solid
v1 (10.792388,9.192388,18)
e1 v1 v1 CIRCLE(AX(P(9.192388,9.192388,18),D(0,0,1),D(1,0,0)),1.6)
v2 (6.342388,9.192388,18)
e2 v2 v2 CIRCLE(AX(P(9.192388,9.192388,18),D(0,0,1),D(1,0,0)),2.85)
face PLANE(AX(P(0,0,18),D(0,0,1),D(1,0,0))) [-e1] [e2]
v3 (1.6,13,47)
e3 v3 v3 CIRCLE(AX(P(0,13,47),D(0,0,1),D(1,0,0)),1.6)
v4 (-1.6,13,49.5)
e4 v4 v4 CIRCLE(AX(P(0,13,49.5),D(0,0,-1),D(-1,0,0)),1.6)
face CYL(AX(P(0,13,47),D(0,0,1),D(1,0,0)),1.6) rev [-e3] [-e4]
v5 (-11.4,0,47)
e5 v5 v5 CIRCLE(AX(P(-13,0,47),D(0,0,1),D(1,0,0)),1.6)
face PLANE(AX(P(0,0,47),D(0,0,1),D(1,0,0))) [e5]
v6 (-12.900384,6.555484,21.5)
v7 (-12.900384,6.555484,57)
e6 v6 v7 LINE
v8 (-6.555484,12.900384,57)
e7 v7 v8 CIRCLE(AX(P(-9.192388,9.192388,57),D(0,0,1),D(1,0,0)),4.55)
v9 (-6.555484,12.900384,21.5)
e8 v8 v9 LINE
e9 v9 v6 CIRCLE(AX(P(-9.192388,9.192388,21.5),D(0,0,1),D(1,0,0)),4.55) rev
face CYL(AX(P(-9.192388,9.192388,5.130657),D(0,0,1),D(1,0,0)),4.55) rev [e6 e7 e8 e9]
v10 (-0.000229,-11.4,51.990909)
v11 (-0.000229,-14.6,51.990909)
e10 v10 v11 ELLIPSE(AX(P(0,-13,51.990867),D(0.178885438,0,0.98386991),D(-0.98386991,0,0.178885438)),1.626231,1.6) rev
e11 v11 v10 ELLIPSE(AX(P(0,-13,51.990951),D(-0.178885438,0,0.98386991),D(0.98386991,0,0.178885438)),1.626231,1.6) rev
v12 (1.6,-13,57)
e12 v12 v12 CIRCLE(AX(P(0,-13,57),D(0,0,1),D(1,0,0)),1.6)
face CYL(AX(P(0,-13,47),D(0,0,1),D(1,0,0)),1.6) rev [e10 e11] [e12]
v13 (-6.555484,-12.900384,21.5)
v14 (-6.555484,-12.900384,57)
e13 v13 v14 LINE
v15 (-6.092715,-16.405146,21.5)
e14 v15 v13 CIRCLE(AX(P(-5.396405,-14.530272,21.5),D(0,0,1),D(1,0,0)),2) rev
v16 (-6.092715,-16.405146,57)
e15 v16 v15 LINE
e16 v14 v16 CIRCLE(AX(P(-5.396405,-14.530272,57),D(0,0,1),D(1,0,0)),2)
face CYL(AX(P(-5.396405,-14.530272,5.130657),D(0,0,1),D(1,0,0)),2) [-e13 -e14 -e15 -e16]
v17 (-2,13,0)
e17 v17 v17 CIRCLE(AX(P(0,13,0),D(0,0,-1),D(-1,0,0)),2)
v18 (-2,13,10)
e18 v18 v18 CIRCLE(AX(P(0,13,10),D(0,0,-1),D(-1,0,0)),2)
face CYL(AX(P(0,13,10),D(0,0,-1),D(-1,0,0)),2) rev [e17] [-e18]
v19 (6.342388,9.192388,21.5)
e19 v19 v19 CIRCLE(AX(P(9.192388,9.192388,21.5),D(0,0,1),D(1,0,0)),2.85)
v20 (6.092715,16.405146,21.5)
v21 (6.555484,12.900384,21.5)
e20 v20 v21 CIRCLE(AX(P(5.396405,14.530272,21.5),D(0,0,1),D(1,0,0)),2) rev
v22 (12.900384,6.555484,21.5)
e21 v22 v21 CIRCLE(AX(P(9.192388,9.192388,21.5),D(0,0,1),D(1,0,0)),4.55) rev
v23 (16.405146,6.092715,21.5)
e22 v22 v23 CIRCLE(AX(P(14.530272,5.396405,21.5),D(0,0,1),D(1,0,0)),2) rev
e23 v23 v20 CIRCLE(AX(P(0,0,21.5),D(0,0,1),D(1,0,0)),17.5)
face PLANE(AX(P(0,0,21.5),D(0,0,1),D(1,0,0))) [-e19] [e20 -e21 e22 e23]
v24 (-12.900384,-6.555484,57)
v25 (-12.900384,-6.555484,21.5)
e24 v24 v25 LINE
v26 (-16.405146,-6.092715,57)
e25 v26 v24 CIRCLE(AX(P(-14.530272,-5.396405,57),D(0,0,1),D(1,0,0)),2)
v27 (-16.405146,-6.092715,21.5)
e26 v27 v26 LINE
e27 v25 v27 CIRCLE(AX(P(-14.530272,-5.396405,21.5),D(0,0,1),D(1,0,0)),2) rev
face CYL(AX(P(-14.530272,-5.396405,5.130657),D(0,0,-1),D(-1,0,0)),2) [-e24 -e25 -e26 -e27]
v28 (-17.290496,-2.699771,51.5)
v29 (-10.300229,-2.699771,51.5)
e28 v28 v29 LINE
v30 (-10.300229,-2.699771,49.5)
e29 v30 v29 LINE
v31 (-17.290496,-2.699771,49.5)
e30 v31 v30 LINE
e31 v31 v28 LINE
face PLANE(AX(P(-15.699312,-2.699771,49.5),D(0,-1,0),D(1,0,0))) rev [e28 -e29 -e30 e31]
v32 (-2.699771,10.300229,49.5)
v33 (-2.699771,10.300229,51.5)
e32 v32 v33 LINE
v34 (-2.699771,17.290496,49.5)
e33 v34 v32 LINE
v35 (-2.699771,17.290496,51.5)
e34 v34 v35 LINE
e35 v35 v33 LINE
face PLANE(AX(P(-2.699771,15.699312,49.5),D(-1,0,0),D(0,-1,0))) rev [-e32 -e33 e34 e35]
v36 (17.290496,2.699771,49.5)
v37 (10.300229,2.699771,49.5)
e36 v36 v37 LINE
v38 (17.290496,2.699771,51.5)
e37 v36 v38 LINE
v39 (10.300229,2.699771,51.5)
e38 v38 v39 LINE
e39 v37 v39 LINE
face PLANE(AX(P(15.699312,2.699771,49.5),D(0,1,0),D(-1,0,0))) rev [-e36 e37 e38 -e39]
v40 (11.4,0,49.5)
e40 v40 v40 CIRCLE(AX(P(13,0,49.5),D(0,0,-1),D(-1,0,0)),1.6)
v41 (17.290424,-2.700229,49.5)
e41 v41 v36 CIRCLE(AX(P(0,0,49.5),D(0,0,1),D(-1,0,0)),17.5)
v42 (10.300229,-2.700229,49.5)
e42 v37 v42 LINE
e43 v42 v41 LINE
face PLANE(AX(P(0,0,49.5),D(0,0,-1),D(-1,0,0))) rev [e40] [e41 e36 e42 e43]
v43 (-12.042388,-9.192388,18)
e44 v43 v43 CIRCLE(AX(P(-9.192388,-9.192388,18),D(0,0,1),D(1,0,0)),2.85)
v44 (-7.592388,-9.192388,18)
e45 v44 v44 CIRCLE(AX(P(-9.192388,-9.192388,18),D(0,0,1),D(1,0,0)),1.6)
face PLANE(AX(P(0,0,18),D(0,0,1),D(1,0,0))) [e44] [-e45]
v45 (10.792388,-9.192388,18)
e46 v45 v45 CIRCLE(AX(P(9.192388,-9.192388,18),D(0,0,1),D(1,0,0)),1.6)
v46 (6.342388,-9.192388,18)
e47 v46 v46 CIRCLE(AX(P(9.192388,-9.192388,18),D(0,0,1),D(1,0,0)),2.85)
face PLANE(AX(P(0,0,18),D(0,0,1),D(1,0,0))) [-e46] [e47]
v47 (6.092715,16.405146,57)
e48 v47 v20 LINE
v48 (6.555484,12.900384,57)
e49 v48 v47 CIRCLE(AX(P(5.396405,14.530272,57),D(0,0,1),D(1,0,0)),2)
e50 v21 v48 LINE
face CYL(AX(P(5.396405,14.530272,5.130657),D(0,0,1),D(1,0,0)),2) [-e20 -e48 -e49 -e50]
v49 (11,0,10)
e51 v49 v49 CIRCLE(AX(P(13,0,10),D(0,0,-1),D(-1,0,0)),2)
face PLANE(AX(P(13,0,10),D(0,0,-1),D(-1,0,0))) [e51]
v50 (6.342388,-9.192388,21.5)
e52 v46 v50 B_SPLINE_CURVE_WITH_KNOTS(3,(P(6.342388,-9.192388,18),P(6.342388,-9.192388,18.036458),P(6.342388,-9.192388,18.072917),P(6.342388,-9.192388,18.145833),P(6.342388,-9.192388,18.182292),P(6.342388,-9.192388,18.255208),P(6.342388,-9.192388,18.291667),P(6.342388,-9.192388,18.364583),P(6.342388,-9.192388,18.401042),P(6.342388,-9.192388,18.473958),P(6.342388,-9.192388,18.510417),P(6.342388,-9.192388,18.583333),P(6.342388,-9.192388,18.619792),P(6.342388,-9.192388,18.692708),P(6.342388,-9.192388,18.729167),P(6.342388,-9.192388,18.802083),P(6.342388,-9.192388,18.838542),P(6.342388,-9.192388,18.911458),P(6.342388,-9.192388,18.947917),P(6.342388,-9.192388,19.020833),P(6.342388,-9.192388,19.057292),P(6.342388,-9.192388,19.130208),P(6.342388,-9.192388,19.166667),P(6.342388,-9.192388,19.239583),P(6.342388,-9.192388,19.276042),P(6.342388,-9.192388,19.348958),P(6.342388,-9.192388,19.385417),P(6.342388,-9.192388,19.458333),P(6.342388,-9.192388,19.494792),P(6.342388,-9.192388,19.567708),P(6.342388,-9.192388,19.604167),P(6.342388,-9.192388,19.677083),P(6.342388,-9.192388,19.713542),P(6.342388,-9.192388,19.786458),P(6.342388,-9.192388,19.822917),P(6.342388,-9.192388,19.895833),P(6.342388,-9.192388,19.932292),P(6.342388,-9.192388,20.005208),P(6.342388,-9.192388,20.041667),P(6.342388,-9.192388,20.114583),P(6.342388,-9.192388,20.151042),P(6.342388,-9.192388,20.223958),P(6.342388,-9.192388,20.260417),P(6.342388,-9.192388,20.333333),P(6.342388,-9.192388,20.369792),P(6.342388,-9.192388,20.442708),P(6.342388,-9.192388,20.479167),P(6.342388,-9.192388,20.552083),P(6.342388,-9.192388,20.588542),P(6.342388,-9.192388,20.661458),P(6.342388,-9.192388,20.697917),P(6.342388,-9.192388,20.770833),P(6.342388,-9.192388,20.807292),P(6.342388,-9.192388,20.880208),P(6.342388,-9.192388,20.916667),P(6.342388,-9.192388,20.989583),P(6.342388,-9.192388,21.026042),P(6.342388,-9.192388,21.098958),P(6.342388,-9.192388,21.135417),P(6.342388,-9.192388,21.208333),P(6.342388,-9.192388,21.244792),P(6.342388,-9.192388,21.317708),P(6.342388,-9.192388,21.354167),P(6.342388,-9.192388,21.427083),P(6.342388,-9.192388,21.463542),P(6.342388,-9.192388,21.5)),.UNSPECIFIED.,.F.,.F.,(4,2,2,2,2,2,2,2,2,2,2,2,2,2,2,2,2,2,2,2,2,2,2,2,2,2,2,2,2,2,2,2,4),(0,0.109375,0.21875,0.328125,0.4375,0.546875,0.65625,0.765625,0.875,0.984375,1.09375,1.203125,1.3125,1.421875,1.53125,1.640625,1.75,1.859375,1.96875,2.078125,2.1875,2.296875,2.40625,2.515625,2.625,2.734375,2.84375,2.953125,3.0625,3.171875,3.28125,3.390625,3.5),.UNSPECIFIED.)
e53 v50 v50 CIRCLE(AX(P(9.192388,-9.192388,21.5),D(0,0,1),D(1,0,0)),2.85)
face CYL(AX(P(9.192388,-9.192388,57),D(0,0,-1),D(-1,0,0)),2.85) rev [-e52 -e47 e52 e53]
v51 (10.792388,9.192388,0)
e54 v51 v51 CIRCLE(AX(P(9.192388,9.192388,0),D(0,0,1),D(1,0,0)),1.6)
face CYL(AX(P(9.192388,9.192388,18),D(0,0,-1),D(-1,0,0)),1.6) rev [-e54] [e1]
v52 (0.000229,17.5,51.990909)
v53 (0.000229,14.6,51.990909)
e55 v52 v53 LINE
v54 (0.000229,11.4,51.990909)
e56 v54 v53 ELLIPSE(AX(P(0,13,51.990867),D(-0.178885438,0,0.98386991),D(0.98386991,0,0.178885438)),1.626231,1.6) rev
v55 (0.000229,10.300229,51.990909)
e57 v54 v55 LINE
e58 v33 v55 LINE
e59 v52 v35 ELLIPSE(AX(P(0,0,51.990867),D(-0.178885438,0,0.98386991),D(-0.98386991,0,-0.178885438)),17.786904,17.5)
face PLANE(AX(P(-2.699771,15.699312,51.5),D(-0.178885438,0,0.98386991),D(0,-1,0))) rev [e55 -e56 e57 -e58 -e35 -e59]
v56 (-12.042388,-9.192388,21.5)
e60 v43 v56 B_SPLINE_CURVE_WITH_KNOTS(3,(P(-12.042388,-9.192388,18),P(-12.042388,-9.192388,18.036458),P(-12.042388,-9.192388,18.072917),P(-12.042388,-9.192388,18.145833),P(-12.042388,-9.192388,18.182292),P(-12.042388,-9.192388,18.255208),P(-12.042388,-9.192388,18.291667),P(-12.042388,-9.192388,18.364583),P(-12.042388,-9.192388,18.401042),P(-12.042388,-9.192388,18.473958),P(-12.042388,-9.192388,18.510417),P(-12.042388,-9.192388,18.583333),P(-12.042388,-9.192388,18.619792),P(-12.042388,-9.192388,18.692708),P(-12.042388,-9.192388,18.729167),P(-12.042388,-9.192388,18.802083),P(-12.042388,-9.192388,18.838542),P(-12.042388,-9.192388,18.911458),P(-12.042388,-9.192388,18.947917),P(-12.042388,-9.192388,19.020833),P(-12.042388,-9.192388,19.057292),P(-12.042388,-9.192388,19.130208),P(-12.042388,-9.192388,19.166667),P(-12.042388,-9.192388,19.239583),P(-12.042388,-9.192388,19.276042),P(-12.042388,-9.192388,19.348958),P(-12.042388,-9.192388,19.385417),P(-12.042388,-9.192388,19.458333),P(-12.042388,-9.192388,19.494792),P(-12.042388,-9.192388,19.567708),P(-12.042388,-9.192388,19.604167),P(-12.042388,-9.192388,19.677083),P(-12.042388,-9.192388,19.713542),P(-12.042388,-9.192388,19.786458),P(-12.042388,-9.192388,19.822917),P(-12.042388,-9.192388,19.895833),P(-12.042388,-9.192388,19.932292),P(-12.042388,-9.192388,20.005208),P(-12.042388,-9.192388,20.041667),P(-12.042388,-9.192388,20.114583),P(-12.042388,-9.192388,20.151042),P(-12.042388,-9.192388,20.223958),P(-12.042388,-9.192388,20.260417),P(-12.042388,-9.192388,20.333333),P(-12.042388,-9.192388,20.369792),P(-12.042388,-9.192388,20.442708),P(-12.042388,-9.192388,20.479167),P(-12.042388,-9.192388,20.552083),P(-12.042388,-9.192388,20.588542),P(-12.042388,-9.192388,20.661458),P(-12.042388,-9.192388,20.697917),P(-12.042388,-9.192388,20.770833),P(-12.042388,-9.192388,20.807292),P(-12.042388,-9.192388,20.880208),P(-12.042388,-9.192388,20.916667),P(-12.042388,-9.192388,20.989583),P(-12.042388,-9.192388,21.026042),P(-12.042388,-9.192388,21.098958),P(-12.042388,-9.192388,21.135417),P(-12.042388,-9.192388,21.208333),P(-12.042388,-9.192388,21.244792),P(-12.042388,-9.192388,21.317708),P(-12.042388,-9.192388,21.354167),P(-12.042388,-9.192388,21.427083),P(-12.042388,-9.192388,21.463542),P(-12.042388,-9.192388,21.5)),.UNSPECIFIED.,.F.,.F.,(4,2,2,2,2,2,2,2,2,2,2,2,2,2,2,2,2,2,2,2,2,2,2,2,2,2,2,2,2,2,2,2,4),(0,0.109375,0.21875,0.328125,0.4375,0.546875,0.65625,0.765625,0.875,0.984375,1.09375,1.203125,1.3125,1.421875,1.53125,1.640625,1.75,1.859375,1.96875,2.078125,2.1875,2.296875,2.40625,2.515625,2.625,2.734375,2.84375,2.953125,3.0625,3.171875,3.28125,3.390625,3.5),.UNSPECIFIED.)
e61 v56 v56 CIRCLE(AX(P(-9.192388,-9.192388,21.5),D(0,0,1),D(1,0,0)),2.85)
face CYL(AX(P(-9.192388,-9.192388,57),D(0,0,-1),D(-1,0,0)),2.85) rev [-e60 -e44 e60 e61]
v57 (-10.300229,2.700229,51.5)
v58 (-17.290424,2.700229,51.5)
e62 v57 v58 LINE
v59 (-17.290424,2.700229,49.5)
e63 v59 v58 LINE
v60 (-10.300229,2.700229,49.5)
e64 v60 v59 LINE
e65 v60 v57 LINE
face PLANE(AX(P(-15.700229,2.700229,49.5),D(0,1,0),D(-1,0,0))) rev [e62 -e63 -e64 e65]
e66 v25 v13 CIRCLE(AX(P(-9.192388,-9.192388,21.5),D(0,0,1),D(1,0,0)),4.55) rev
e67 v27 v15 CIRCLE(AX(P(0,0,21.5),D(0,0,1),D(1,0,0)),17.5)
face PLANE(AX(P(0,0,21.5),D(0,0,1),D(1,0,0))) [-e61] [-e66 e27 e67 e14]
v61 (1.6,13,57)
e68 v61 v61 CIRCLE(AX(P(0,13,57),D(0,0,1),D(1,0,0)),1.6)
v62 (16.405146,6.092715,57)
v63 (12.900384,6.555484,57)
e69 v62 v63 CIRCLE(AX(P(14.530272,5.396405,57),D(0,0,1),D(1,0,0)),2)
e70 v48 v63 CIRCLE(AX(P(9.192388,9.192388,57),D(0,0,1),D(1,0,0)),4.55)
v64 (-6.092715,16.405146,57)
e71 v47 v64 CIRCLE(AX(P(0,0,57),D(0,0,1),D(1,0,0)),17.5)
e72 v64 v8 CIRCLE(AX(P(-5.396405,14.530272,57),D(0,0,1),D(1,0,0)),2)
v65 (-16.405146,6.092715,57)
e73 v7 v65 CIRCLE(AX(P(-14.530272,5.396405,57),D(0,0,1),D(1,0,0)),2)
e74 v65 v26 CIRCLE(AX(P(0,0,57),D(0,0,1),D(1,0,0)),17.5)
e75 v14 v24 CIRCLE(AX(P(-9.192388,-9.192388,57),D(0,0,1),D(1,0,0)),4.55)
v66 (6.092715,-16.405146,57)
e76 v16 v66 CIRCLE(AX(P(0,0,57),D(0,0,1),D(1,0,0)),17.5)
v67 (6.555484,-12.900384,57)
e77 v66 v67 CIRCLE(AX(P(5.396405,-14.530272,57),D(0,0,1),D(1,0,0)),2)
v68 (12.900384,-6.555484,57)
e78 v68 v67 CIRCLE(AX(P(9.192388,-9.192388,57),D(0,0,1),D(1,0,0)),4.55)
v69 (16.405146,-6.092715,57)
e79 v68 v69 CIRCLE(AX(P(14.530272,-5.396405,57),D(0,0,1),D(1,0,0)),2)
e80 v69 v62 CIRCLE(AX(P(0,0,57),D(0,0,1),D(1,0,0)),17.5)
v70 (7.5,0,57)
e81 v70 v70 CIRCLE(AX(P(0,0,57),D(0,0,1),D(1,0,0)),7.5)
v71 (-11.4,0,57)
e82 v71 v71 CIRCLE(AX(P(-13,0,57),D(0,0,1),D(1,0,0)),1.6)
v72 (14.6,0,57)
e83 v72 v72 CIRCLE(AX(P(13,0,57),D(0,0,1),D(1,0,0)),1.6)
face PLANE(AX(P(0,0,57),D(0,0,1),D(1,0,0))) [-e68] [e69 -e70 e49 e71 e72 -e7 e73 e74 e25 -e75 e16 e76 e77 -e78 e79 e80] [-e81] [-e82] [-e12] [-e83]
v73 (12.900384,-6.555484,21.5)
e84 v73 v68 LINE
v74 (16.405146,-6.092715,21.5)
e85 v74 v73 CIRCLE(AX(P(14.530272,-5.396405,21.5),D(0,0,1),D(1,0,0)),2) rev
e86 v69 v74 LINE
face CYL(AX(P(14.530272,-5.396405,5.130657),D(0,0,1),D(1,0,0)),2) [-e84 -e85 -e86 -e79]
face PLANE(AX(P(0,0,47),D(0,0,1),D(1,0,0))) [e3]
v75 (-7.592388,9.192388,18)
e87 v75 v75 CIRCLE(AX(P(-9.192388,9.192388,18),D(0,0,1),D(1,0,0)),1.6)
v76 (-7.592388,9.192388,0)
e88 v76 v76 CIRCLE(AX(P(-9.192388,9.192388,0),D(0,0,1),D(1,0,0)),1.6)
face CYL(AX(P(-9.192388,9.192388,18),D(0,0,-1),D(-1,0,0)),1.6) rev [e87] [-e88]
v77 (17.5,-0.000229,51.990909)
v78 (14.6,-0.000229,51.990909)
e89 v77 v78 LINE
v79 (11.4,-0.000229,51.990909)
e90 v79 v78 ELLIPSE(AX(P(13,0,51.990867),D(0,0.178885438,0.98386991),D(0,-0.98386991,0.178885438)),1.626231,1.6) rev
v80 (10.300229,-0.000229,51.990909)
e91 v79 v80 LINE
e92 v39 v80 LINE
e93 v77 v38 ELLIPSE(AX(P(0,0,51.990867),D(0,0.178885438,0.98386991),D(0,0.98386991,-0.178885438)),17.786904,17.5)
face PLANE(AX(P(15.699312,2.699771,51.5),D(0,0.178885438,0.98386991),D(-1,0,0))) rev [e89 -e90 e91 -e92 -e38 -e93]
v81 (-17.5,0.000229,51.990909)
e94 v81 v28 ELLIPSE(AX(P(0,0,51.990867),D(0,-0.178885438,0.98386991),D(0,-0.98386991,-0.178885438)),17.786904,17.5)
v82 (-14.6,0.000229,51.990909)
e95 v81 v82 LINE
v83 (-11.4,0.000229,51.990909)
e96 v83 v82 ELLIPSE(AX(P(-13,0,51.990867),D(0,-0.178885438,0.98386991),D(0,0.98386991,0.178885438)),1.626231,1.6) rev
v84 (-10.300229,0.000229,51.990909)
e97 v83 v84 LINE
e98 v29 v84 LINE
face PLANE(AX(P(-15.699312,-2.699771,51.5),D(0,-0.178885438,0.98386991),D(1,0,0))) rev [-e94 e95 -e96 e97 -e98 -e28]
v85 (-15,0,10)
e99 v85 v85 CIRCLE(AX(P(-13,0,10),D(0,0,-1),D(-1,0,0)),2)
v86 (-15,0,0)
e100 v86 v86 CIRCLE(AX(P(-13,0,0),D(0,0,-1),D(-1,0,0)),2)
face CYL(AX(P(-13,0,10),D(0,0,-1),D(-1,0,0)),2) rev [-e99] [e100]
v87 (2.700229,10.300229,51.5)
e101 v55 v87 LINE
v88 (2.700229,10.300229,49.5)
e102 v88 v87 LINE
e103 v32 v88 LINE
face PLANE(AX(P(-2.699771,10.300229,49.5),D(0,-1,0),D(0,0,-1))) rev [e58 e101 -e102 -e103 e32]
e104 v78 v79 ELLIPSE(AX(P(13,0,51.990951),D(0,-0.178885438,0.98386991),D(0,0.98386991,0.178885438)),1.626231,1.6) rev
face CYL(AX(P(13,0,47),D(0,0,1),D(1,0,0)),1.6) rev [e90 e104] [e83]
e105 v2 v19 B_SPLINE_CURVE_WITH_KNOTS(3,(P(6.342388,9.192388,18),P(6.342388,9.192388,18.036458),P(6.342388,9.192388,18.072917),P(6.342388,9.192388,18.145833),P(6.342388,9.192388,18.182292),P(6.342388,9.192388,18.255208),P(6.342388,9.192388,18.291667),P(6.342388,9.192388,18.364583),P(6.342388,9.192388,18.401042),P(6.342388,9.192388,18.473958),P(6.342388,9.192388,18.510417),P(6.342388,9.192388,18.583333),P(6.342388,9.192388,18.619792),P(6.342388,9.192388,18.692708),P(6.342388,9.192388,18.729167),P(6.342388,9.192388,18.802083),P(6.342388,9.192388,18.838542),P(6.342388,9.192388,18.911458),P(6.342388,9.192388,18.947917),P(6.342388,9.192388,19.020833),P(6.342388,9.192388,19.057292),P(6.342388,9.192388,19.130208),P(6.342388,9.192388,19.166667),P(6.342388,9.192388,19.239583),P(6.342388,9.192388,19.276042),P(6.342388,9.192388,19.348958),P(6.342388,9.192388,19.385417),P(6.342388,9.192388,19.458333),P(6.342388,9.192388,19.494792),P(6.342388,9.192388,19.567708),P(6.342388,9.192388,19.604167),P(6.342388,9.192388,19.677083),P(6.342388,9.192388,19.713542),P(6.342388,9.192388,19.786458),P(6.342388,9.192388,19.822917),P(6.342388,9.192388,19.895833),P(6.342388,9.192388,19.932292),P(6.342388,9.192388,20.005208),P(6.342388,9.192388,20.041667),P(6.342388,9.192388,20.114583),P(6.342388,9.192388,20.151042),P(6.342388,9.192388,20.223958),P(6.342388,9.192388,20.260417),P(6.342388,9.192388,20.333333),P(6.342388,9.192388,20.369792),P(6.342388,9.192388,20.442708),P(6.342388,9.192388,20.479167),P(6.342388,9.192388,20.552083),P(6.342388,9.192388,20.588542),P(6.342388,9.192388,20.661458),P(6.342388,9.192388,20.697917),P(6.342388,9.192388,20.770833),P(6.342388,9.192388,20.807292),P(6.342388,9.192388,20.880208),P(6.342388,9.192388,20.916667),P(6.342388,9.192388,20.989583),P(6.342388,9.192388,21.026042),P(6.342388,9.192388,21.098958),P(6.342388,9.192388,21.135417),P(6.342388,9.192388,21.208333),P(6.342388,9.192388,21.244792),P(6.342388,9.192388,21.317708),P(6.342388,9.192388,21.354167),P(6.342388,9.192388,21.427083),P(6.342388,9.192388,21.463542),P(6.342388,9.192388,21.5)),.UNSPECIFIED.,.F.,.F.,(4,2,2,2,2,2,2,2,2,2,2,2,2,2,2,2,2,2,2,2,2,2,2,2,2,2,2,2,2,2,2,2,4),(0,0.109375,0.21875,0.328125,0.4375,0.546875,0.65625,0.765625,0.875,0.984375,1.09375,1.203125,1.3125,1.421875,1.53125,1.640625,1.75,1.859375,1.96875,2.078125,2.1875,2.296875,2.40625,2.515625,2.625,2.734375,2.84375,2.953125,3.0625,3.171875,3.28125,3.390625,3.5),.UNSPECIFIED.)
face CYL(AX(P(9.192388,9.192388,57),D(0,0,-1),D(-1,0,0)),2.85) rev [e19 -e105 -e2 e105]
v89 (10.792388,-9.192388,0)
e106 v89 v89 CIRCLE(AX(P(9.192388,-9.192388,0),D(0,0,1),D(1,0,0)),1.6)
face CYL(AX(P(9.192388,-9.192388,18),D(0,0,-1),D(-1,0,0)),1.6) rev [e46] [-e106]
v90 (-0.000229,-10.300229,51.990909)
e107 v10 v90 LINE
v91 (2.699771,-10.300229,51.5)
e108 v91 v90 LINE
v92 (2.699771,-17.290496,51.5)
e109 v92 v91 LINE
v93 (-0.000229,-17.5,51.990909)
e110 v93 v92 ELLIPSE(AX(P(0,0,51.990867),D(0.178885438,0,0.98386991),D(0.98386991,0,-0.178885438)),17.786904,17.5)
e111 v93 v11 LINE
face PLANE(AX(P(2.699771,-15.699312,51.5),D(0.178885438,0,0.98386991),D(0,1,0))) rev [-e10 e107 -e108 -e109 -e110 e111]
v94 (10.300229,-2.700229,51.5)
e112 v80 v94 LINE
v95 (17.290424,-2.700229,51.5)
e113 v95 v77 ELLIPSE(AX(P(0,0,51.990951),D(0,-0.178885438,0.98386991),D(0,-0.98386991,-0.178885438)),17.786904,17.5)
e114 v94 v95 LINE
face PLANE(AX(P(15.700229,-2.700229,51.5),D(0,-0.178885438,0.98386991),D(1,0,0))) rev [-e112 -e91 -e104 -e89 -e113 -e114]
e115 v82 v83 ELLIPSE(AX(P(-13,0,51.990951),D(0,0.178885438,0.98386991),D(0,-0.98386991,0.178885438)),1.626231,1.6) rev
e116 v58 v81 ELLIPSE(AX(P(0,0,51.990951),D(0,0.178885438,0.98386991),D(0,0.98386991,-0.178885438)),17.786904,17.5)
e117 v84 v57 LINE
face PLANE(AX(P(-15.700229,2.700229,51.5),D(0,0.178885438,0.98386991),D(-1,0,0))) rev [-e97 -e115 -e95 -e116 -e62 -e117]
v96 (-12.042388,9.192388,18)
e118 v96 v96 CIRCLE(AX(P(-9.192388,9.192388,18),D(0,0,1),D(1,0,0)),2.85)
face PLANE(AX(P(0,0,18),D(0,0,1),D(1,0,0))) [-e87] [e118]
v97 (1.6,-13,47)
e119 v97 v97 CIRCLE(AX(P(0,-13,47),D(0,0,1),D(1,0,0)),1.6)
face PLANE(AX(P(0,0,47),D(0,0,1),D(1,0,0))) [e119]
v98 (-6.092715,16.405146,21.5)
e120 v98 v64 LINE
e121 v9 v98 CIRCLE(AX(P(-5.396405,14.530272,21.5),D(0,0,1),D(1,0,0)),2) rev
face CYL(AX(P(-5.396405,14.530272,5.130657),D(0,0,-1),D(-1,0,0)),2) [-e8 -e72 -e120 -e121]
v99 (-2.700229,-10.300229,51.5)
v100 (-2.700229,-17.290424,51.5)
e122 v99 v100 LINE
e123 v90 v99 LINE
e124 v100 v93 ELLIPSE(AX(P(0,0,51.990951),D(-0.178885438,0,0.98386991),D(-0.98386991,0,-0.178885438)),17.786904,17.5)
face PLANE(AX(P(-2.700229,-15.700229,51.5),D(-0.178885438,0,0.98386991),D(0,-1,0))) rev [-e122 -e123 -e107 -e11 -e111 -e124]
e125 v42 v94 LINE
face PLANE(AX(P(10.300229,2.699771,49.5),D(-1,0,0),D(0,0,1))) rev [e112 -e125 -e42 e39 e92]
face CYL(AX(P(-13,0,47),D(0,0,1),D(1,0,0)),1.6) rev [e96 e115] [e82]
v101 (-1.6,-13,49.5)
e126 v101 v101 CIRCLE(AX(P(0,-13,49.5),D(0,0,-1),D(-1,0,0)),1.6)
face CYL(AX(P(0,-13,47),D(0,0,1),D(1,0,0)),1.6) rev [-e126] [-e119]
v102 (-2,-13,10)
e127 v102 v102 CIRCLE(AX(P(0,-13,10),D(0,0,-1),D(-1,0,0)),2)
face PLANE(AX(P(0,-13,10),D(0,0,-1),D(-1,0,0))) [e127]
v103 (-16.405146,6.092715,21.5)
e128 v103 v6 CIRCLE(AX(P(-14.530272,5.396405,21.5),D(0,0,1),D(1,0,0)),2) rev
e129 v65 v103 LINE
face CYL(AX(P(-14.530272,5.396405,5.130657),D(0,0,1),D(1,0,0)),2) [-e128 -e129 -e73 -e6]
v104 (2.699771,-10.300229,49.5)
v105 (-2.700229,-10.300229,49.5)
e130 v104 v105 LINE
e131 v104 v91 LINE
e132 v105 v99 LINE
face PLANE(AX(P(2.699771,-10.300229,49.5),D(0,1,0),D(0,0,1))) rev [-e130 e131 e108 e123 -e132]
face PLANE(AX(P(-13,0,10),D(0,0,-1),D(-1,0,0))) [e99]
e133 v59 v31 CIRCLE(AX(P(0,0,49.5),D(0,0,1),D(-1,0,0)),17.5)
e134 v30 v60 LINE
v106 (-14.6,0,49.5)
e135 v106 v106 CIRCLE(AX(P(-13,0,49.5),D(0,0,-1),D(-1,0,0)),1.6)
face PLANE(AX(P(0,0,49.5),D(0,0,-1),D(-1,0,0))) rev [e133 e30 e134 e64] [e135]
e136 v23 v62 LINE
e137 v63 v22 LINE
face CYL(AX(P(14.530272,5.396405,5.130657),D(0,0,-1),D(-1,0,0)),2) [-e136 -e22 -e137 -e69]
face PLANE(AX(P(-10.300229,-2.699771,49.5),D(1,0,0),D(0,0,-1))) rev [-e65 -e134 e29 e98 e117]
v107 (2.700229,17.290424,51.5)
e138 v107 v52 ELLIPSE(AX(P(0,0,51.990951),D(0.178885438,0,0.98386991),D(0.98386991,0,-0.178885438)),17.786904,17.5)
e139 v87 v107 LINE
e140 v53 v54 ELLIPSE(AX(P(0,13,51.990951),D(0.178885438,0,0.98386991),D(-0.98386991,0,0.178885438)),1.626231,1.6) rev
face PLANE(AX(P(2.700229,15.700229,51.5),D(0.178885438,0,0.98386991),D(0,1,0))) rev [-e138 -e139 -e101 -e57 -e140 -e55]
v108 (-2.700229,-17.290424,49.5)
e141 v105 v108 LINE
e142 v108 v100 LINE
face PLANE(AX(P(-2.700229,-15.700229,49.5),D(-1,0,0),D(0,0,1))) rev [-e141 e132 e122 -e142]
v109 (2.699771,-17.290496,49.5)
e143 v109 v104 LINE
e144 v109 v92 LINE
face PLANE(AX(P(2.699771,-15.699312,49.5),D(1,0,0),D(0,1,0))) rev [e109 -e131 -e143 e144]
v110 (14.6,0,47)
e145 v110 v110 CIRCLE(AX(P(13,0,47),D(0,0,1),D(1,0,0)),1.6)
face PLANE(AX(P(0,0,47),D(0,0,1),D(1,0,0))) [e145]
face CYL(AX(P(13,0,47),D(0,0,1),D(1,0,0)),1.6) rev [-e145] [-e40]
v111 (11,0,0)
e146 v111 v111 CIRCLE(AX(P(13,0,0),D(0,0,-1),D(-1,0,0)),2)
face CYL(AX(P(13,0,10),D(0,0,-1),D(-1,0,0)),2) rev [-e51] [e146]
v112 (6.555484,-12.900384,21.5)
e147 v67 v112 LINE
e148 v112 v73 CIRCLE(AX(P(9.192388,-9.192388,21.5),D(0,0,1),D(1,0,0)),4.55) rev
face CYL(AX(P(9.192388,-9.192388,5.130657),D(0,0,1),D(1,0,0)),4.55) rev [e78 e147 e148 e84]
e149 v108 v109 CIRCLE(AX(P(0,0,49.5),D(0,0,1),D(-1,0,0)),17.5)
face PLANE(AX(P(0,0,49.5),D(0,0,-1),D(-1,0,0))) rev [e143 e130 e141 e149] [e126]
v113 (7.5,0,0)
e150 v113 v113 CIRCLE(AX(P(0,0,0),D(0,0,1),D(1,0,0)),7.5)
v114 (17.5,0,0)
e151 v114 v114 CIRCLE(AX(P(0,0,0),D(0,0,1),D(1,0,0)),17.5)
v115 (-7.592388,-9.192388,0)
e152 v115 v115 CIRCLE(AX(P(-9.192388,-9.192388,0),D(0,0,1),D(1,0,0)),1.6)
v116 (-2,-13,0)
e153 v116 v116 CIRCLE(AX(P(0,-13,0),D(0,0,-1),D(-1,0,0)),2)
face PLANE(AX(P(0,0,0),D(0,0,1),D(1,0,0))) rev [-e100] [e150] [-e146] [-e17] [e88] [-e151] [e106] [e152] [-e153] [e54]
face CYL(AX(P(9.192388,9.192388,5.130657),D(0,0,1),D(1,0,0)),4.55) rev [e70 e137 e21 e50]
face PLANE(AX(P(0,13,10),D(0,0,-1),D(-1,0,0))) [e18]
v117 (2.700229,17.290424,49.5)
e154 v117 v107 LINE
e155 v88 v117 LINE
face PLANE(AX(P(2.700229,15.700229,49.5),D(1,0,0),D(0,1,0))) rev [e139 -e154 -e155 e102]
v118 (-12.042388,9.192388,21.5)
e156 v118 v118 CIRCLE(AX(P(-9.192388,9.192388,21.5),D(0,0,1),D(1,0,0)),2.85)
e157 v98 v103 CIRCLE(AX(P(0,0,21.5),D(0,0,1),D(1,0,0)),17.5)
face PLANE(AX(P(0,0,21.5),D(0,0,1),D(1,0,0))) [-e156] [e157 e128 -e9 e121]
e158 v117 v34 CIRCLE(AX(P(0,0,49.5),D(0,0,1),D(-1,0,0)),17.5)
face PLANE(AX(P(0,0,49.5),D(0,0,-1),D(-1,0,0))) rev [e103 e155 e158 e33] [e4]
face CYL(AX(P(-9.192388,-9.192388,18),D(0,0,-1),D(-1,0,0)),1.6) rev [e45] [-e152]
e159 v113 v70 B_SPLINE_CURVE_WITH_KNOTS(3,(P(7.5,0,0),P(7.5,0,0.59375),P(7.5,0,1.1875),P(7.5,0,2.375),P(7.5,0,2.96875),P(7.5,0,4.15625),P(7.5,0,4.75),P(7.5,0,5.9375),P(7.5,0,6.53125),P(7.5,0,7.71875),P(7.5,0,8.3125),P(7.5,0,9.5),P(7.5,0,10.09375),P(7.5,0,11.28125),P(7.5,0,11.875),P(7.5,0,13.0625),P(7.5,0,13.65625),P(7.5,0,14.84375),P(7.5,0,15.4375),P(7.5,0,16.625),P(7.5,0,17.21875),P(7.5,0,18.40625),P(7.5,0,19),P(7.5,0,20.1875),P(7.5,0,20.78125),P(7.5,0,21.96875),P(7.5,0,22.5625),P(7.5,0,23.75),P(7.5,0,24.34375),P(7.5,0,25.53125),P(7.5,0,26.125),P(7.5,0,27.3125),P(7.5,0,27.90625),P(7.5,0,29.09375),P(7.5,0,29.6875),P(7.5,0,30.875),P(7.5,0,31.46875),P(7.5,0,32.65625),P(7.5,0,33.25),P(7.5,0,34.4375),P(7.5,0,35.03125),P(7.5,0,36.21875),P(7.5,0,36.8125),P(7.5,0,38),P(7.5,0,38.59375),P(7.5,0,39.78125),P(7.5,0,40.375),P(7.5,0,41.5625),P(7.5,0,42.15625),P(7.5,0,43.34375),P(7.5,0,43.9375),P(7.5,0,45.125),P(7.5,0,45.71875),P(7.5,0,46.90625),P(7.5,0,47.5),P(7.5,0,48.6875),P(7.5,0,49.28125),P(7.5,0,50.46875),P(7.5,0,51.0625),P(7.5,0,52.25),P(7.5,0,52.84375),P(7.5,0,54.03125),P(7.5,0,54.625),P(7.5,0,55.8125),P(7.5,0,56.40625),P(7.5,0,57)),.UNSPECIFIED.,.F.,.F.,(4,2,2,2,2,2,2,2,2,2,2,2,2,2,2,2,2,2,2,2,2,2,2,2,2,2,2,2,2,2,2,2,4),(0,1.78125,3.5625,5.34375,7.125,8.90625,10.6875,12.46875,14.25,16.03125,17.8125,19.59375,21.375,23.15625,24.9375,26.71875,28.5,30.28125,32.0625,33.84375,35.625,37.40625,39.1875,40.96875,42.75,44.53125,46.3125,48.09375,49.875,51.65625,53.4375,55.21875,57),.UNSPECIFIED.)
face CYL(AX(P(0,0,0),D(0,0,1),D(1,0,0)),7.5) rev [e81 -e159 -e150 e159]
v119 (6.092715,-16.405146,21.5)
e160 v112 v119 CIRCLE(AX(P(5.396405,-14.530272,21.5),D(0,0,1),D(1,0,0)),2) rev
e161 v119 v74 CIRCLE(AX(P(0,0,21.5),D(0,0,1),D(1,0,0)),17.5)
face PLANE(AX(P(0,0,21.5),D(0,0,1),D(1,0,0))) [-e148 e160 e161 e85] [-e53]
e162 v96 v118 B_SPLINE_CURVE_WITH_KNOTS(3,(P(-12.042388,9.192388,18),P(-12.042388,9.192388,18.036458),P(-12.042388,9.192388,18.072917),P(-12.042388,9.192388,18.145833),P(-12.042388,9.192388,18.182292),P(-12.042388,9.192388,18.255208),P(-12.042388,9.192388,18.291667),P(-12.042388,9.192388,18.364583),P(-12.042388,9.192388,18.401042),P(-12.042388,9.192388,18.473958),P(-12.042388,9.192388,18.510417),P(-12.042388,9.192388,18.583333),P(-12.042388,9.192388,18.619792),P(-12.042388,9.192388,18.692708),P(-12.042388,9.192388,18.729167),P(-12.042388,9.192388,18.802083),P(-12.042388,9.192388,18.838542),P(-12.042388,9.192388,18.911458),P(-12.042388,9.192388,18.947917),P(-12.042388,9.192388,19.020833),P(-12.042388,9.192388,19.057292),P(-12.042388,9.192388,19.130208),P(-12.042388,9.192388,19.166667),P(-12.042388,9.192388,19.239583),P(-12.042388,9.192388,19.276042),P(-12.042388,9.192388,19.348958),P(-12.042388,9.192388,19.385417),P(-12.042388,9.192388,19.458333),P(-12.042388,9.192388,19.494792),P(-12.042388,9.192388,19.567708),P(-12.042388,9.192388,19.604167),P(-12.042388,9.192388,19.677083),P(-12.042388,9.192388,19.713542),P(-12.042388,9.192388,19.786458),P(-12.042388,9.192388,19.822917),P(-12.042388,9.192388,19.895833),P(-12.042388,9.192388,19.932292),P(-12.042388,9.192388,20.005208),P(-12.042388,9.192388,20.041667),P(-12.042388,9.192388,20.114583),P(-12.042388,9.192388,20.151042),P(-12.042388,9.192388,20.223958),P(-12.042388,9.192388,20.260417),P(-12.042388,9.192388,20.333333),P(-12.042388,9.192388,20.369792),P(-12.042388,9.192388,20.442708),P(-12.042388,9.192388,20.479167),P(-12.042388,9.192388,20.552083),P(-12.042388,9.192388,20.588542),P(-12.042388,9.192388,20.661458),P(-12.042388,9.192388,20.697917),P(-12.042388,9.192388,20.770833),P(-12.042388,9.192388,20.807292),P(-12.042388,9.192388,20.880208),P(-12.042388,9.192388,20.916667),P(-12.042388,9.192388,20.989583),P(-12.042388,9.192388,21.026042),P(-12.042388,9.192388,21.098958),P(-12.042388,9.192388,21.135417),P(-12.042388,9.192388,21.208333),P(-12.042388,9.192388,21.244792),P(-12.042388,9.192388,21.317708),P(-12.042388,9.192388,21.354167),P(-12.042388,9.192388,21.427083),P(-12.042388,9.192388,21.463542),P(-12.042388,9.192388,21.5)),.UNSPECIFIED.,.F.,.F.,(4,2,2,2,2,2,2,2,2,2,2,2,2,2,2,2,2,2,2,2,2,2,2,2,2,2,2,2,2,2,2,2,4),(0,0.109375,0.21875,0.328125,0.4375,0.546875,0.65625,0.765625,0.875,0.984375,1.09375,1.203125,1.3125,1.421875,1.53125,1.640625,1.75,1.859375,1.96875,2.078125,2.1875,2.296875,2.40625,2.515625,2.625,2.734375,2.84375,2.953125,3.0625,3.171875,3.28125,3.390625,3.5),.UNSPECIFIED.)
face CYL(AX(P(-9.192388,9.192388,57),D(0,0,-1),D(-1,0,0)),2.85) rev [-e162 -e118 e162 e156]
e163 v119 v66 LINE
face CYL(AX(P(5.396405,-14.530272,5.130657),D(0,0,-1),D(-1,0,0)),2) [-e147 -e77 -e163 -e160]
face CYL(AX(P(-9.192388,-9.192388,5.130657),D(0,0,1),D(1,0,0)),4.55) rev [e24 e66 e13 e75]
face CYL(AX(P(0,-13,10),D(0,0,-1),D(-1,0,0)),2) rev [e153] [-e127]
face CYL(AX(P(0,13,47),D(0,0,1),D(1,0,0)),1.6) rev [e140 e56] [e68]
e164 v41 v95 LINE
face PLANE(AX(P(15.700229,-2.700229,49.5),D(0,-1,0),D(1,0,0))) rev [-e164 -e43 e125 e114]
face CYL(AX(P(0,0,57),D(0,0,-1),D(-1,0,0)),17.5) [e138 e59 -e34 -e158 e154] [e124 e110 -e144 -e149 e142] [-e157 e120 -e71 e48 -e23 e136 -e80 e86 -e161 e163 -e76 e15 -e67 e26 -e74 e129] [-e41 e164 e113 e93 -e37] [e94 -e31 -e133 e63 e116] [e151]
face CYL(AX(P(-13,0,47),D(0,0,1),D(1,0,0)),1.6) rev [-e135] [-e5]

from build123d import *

# Parameters (mm, degrees)
SKETCH1_R           = 17.5
SKETCH1_R_2         = 2.85
BOSS_EXTRUDE1_DEPTH = 57
SKETCH1_3_R         = 2.85
SKETCH1_3_R_2       = 1.6
BOSS_EXTRUDE2_DEPTH = 18
SKETCH2_R           = 4.55
CUT_EXTRUDE1_DEPTH  = 35.5
FILLET1_R           = 2
CUT_EXTRUDE2_START  = -7.5
SKETCH3_R           = 1.6
CUT_EXTRUDE2_DEPTH  = 2.5
CUT_EXTRUDE3_START  = -10
SKETCH3_2_R         = 1.6
CUT_EXTRUDE3_DEPTH  = 10
CHAMFER1_SIZE       = 2.75
CHAMFER1_SIZE_2     = 0.5
SKETCH4_R           = 7.5
CUT_EXTRUDE4_DEPTH  = 63.140968921
SKETCH5_R           = 2
CUT_EXTRUDE5_DEPTH  = 10


with BuildPart() as part:
    # Sketch1 → Boss-Extrude1 (new body)
    with BuildSketch(Plane(origin=(0, 0, 0), x_dir=(0, 1, 0), z_dir=(0, 0, 1))):
        with Locations(Location((0, 0, 0), (0, 0, 90))):
            Circle(SKETCH1_R)
        with Locations(Location((-9.192388155, 9.192388155, 0), (0, 0, 90))):
            Circle(SKETCH1_R_2, mode=Mode.SUBTRACT)
        with Locations(Location((-9.192388155, -9.192388155, 0), (0, 0, 90))):
            Circle(SKETCH1_R_2, mode=Mode.SUBTRACT)
        with Locations(Location((9.192388155, -9.192388155, 0), (0, 0, 90))):
            Circle(SKETCH1_R_2, mode=Mode.SUBTRACT)
        with Locations(Location((9.192388155, 9.192388155, 0), (0, 0, 90))):
            Circle(SKETCH1_R_2, mode=Mode.SUBTRACT)
    extrude(amount=BOSS_EXTRUDE1_DEPTH)

    # Sketch1<3> → Boss-Extrude2 (add)
    # profile 1 of 4: a face of its own
    with BuildSketch(Plane(origin=(0, 0, 0), x_dir=(0, 1, 0), z_dir=(0, 0, 1))):
        with Locations(Location((-9.192388155, -9.192388155, 0), (0, 0, 90))):
            Circle(SKETCH1_3_R)
        with Locations(Location((-9.192388155, -9.192388155, 0), (0, 0, 270))):
            Circle(SKETCH1_3_R_2, mode=Mode.SUBTRACT)
    # profile 2 of 4: a face of its own
    with BuildSketch(Plane(origin=(0, 0, 0), x_dir=(0, 1, 0), z_dir=(0, 0, 1))):
        with Locations(Location((-9.192388155, 9.192388155, 0), (0, 0, 90))):
            Circle(SKETCH1_3_R)
        with Locations(Location((-9.192388155, 9.192388155, 0), (0, 0, 270))):
            Circle(SKETCH1_3_R_2, mode=Mode.SUBTRACT)
    # profile 3 of 4: a face of its own
    with BuildSketch(Plane(origin=(0, 0, 0), x_dir=(0, 1, 0), z_dir=(0, 0, 1))):
        with Locations(Location((9.192388155, -9.192388155, 0), (0, 0, 90))):
            Circle(SKETCH1_3_R)
        with Locations(Location((9.192388155, -9.192388155, 0), (0, 0, 270))):
            Circle(SKETCH1_3_R_2, mode=Mode.SUBTRACT)
    # profile 4 of 4: a face of its own
    with BuildSketch(Plane(origin=(0, 0, 0), x_dir=(0, 1, 0), z_dir=(0, 0, 1))):
        with Locations(Location((9.192388155, 9.192388155, 0), (0, 0, 90))):
            Circle(SKETCH1_3_R)
        with Locations(Location((9.192388155, 9.192388155, 0), (0, 0, 270))):
            Circle(SKETCH1_3_R_2, mode=Mode.SUBTRACT)
    extrude(amount=BOSS_EXTRUDE2_DEPTH)

    # Sketch2 → Cut-Extrude1 (cut)
    with BuildSketch(Plane.XY.offset(57)):
        with Locations((-9.192388155, 9.192388155)):
            Circle(SKETCH2_R)
        with Locations((9.192388155, 9.192388155)):
            Circle(SKETCH2_R)
        with Locations((9.192388155, -9.192388155)):
            Circle(SKETCH2_R)
        with Locations((-9.192388155, -9.192388155)):
            Circle(SKETCH2_R)
    extrude(amount=-CUT_EXTRUDE1_DEPTH, mode=Mode.SUBTRACT)

    # Fillet1
    fillet1_edges = [part.edges().sort_by_distance(p)[0] for p in [
        (-12.913801236, -11.810323351, 39.25),
        (-11.810323351, -12.913801236, 39.25),
        (11.810323351, -12.913801236, 39.25),
        (12.913801236, -11.810323351, 39.25),
        (12.913801236, 11.810323351, 39.25),
        (11.810323351, 12.913801236, 39.25),
        (-11.810323351, 12.913801236, 39.25),
        (-12.913801236, 11.810323351, 39.25),
    ]]
    fillet(fillet1_edges, radius=FILLET1_R)

    # Sketch3 → Cut-Extrude2 (cut)
    # profile 1 of 4: a face of its own
    with BuildSketch(Plane.XY.offset(57).offset(CUT_EXTRUDE2_START)):
        with BuildLine():
            Line((-2.699770647, 15.699312019), (-2.699770647, 17.29049561))
            ThreePointArc((-2.699770647, 17.29049561), (0.000232132, 17.499999998), (2.700229353, 17.290423981))
            Line((2.700229353, 17.290423981), (2.700229353, 15.700229353))
            Line((2.700229353, 15.700229353), (2.700229353, 10.300229353))
            Line((2.700229353, 10.300229353), (-2.699770647, 10.300229353))
            Line((-2.699770647, 10.300229353), (-2.699770647, 15.699312019))
        make_face()
        with Locations((0, 13)):
            Circle(SKETCH3_R, mode=Mode.SUBTRACT)
    # profile 2 of 4: a face of its own
    with BuildSketch(Plane.XY.offset(57).offset(CUT_EXTRUDE2_START)):
        with BuildLine():
            Line((15.700229353, -2.700229353), (10.300229353, -2.700229353))
            Line((10.300229353, -2.700229353), (10.300229353, 2.699770647))
            Line((10.300229353, 2.699770647), (15.699312019, 2.699770647))
            Line((15.699312019, 2.699770647), (17.29049561, 2.699770647))
            ThreePointArc((17.29049561, 2.699770647), (17.499999998, -0.000232132), (17.290423981, -2.700229353))
            Line((17.290423981, -2.700229353), (15.700229353, -2.700229353))
        make_face()
        with Locations((13, 0)):
            Circle(SKETCH3_R, mode=Mode.SUBTRACT)
    # profile 3 of 4: a face of its own
    with BuildSketch(Plane.XY.offset(57).offset(CUT_EXTRUDE2_START)):
        with BuildLine():
            Line((-2.700229353, -15.700229353), (-2.700229353, -10.300229353))
            Line((-2.700229353, -10.300229353), (2.699770647, -10.300229353))
            Line((2.699770647, -10.300229353), (2.699770647, -15.699312019))
            Line((2.699770647, -15.699312019), (2.699770647, -17.29049561))
            ThreePointArc((2.699770647, -17.29049561), (-0.000232132, -17.499999998), (-2.700229353, -17.290423981))
            Line((-2.700229353, -17.290423981), (-2.700229353, -15.700229353))
        make_face()
        with Locations((0, -13)):
            Circle(SKETCH3_R, mode=Mode.SUBTRACT)
    # profile 4 of 4: a face of its own
    with BuildSketch(Plane.XY.offset(57).offset(CUT_EXTRUDE2_START)):
        with BuildLine():
            Line((-15.700229353, 2.700229353), (-10.300229353, 2.700229353))
            Line((-10.300229353, 2.700229353), (-10.300229353, -2.699770647))
            Line((-10.300229353, -2.699770647), (-15.699312019, -2.699770647))
            Line((-15.699312019, -2.699770647), (-17.29049561, -2.699770647))
            ThreePointArc((-17.29049561, -2.699770647), (-17.499999998, 0.000232132), (-17.290423981, 2.700229353))
            Line((-17.290423981, 2.700229353), (-15.700229353, 2.700229353))
        make_face()
        with Locations((-13, 0)):
            Circle(SKETCH3_R, mode=Mode.SUBTRACT)
    extrude(amount=CUT_EXTRUDE2_DEPTH, mode=Mode.SUBTRACT)

    # Sketch3<2> → Cut-Extrude3 (cut)
    with BuildSketch(Plane.XY.offset(57).offset(CUT_EXTRUDE3_START)):
        with Locations((-13, 0)):
            Circle(SKETCH3_2_R)
        with Locations((0, 13)):
            Circle(SKETCH3_2_R)
        with Locations((13, 0)):
            Circle(SKETCH3_2_R)
        with Locations((0, -13)):
            Circle(SKETCH3_2_R)
    extrude(amount=CUT_EXTRUDE3_DEPTH, mode=Mode.SUBTRACT)

    # Chamfer1
    # the kernel refuses this chamfer: 2.75, 0.5 mm, written as the material it adds along each edge
    with BuildSketch(Plane(origin=(-3.154495794, -2.699770647, 52), x_dir=(0, 0.9999763028084744, 0.006884317068104265), z_dir=(-1, 0, 0))) as chamfer1_piece_1_section:
        Polygon((CHAMFER1_SIZE * 0.999976302808, CHAMFER1_SIZE * 0.0068843170681), (-CHAMFER1_SIZE_2 * 0.0068843170681, CHAMFER1_SIZE_2 * 0.999976302808), (0, 0), align=None)
    chamfer1_piece_1 = extrude(amount=21.281733376, mode=Mode.PRIVATE)
    chamfer1_piece_1 = chamfer1_piece_1 & Plane(origin=(0, 0, 51.863927103), x_dir=(-1, 0, 0), z_dir=(0, 0, -1)) * Cylinder(17.5, 54, mode=Mode.PRIVATE)
    chamfer1_piece_1 = chamfer1_piece_1 - Plane(origin=(-13, 0, 51.863927103), x_dir=(1, 0, 0), z_dir=(0, 0, -1)) * Cylinder(1.6, 54, mode=Mode.PRIVATE)
    add(chamfer1_piece_1)
    with BuildSketch(Plane(origin=(-24.43615754, 2.700229353, 52), x_dir=(0, -0.9999763028084744, 0.006884317068104265), z_dir=(1, 0, 0))) as chamfer1_piece_2_section:
        Polygon((CHAMFER1_SIZE * 0.999976302808, CHAMFER1_SIZE * 0.0068843170681), (-CHAMFER1_SIZE_2 * 0.0068843170681, CHAMFER1_SIZE_2 * 0.999976302808), (0, 0), align=None)
    chamfer1_piece_2 = extrude(amount=21.281661746, mode=Mode.PRIVATE)
    chamfer1_piece_2 = chamfer1_piece_2 & Plane(origin=(0, 0, 51.851524539), x_dir=(-1, 0, 0), z_dir=(0, 0, -1)) * Cylinder(17.5, 54, mode=Mode.PRIVATE)
    chamfer1_piece_2 = chamfer1_piece_2 - Plane(origin=(-13, 0, 51.851524539), x_dir=(1, 0, 0), z_dir=(0, 0, -1)) * Cylinder(1.6, 54, mode=Mode.PRIVATE)
    add(chamfer1_piece_2)
    with BuildSketch(Plane(origin=(-2.699770647, 3.154495794, 52), x_dir=(0.9999763028084744, 0, 0.006884317068104265), z_dir=(0, 1, 0))) as chamfer1_piece_3_section:
        Polygon((CHAMFER1_SIZE * 0.999976302808, CHAMFER1_SIZE * 0.0068843170681), (-CHAMFER1_SIZE_2 * 0.0068843170681, CHAMFER1_SIZE_2 * 0.999976302808), (0, 0), align=None)
    chamfer1_piece_3 = extrude(amount=21.281733376, mode=Mode.PRIVATE)
    chamfer1_piece_3 = chamfer1_piece_3 & Plane(origin=(0, 0, 51.863927103), x_dir=(-1, 0, 0), z_dir=(0, 0, -1)) * Cylinder(17.5, 54, mode=Mode.PRIVATE)
    chamfer1_piece_3 = chamfer1_piece_3 - Plane(origin=(0, 13, 51.863927103), x_dir=(1, 0, 0), z_dir=(0, 0, -1)) * Cylinder(1.6, 54, mode=Mode.PRIVATE)
    add(chamfer1_piece_3)
    with BuildSketch(Plane(origin=(2.700229353, 24.43615754, 52), x_dir=(0.20388124945923355, 0, -0.9789956262001082), z_dir=(0, -1, 0))) as chamfer1_piece_4_section:
        Polygon((CHAMFER1_SIZE_2 * 0.9789956262, -CHAMFER1_SIZE_2 * 0.203881249459), (-CHAMFER1_SIZE * 0.203881249459, -CHAMFER1_SIZE * 0.9789956262), (0, 0), align=None)
    chamfer1_piece_4 = extrude(amount=21.281661746, mode=Mode.PRIVATE)
    chamfer1_piece_4 = chamfer1_piece_4 & Plane(origin=(0, 0, 51.851524604), x_dir=(-1, 0, 0), z_dir=(0, 0, -1)) * Cylinder(17.5, 54, mode=Mode.PRIVATE)
    chamfer1_piece_4 = chamfer1_piece_4 - Plane(origin=(0, 13, 51.851524604), x_dir=(1, 0, 0), z_dir=(0, 0, -1)) * Cylinder(1.6, 54, mode=Mode.PRIVATE)
    add(chamfer1_piece_4)
    with BuildSketch(Plane(origin=(3.154495794, 2.699770647, 52), x_dir=(0, -0.9999763028084744, 0.006884317068104265), z_dir=(1, 0, 0))) as chamfer1_piece_5_section:
        Polygon((CHAMFER1_SIZE * 0.999976302808, CHAMFER1_SIZE * 0.0068843170681), (-CHAMFER1_SIZE_2 * 0.0068843170681, CHAMFER1_SIZE_2 * 0.999976302808), (0, 0), align=None)
    chamfer1_piece_5 = extrude(amount=21.281733376, mode=Mode.PRIVATE)
    chamfer1_piece_5 = chamfer1_piece_5 & Plane(origin=(0, 0, 51.863927103), x_dir=(-1, 0, 0), z_dir=(0, 0, -1)) * Cylinder(17.5, 54, mode=Mode.PRIVATE)
    chamfer1_piece_5 = chamfer1_piece_5 - Plane(origin=(13, 0, 51.863927103), x_dir=(1, 0, 0), z_dir=(0, 0, -1)) * Cylinder(1.6, 54, mode=Mode.PRIVATE)
    add(chamfer1_piece_5)
    with BuildSketch(Plane(origin=(24.43615754, -2.700229353, 52), x_dir=(0, -0.20388124945923355, -0.9789956262001082), z_dir=(-1, 0, 0))) as chamfer1_piece_6_section:
        Polygon((CHAMFER1_SIZE_2 * 0.9789956262, -CHAMFER1_SIZE_2 * 0.203881249459), (-CHAMFER1_SIZE * 0.203881249459, -CHAMFER1_SIZE * 0.9789956262), (0, 0), align=None)
    chamfer1_piece_6 = extrude(amount=21.281661746, mode=Mode.PRIVATE)
    chamfer1_piece_6 = chamfer1_piece_6 & Plane(origin=(0, 0, 51.8515245), x_dir=(-1, 0, 0), z_dir=(0, 0, -1)) * Cylinder(17.5, 54, mode=Mode.PRIVATE)
    chamfer1_piece_6 = chamfer1_piece_6 - Plane(origin=(13, 0, 51.8515245), x_dir=(1, 0, 0), z_dir=(0, 0, -1)) * Cylinder(1.6, 54, mode=Mode.PRIVATE)
    add(chamfer1_piece_6)
    with BuildSketch(Plane(origin=(2.699770647, -3.154495794, 52), x_dir=(-0.9999763028084744, 0, 0.006884317068104265), z_dir=(0, -1, 0))) as chamfer1_piece_7_section:
        Polygon((CHAMFER1_SIZE * 0.999976302808, CHAMFER1_SIZE * 0.0068843170681), (-CHAMFER1_SIZE_2 * 0.0068843170681, CHAMFER1_SIZE_2 * 0.999976302808), (0, 0), align=None)
    chamfer1_piece_7 = extrude(amount=21.281733376, mode=Mode.PRIVATE)
    chamfer1_piece_7 = chamfer1_piece_7 & Plane(origin=(0, 0, 51.863927103), x_dir=(-1, 0, 0), z_dir=(0, 0, -1)) * Cylinder(17.5, 54, mode=Mode.PRIVATE)
    chamfer1_piece_7 = chamfer1_piece_7 - Plane(origin=(0, -13, 51.863927103), x_dir=(1, 0, 0), z_dir=(0, 0, -1)) * Cylinder(1.6, 54, mode=Mode.PRIVATE)
    add(chamfer1_piece_7)
    with BuildSketch(Plane(origin=(-2.700229353, -24.43615754, 52), x_dir=(-0.20388124945923355, 0, -0.9789956262001082), z_dir=(0, 1, 0))) as chamfer1_piece_8_section:
        Polygon((CHAMFER1_SIZE_2 * 0.9789956262, -CHAMFER1_SIZE_2 * 0.203881249459), (-CHAMFER1_SIZE * 0.203881249459, -CHAMFER1_SIZE * 0.9789956262), (0, 0), align=None)
    chamfer1_piece_8 = extrude(amount=21.281661746, mode=Mode.PRIVATE)
    chamfer1_piece_8 = chamfer1_piece_8 & Plane(origin=(0, 0, 51.851524701), x_dir=(-1, 0, 0), z_dir=(0, 0, -1)) * Cylinder(17.5, 54, mode=Mode.PRIVATE)
    chamfer1_piece_8 = chamfer1_piece_8 - Plane(origin=(0, -13, 51.851524701), x_dir=(1, 0, 0), z_dir=(0, 0, -1)) * Cylinder(1.6, 54, mode=Mode.PRIVATE)
    add(chamfer1_piece_8)

    # Sketch4 → Cut-Extrude4 (cut, through all)
    with BuildSketch(Plane.XY.offset(57)):
        Circle(SKETCH4_R)
    extrude(amount=-CUT_EXTRUDE4_DEPTH, mode=Mode.SUBTRACT)

    # Sketch5 → Cut-Extrude5 (cut)
    with BuildSketch(Plane(origin=(0, 0, 0), x_dir=(1, 0, 0), z_dir=(0, 0, -1))):
        with Locations(Location((0, 13, 0), (0, 0, 180))):
            Circle(SKETCH5_R)
        with Locations(Location((13, 0, 0), (0, 0, 180))):
            Circle(SKETCH5_R)
        with Locations(Location((0, -13, 0), (0, 0, 180))):
            Circle(SKETCH5_R)
        with Locations(Location((-13, 0, 0), (0, 0, 180))):
            Circle(SKETCH5_R)
    extrude(amount=-CUT_EXTRUDE5_DEPTH, mode=Mode.SUBTRACT)


solid = part.part
